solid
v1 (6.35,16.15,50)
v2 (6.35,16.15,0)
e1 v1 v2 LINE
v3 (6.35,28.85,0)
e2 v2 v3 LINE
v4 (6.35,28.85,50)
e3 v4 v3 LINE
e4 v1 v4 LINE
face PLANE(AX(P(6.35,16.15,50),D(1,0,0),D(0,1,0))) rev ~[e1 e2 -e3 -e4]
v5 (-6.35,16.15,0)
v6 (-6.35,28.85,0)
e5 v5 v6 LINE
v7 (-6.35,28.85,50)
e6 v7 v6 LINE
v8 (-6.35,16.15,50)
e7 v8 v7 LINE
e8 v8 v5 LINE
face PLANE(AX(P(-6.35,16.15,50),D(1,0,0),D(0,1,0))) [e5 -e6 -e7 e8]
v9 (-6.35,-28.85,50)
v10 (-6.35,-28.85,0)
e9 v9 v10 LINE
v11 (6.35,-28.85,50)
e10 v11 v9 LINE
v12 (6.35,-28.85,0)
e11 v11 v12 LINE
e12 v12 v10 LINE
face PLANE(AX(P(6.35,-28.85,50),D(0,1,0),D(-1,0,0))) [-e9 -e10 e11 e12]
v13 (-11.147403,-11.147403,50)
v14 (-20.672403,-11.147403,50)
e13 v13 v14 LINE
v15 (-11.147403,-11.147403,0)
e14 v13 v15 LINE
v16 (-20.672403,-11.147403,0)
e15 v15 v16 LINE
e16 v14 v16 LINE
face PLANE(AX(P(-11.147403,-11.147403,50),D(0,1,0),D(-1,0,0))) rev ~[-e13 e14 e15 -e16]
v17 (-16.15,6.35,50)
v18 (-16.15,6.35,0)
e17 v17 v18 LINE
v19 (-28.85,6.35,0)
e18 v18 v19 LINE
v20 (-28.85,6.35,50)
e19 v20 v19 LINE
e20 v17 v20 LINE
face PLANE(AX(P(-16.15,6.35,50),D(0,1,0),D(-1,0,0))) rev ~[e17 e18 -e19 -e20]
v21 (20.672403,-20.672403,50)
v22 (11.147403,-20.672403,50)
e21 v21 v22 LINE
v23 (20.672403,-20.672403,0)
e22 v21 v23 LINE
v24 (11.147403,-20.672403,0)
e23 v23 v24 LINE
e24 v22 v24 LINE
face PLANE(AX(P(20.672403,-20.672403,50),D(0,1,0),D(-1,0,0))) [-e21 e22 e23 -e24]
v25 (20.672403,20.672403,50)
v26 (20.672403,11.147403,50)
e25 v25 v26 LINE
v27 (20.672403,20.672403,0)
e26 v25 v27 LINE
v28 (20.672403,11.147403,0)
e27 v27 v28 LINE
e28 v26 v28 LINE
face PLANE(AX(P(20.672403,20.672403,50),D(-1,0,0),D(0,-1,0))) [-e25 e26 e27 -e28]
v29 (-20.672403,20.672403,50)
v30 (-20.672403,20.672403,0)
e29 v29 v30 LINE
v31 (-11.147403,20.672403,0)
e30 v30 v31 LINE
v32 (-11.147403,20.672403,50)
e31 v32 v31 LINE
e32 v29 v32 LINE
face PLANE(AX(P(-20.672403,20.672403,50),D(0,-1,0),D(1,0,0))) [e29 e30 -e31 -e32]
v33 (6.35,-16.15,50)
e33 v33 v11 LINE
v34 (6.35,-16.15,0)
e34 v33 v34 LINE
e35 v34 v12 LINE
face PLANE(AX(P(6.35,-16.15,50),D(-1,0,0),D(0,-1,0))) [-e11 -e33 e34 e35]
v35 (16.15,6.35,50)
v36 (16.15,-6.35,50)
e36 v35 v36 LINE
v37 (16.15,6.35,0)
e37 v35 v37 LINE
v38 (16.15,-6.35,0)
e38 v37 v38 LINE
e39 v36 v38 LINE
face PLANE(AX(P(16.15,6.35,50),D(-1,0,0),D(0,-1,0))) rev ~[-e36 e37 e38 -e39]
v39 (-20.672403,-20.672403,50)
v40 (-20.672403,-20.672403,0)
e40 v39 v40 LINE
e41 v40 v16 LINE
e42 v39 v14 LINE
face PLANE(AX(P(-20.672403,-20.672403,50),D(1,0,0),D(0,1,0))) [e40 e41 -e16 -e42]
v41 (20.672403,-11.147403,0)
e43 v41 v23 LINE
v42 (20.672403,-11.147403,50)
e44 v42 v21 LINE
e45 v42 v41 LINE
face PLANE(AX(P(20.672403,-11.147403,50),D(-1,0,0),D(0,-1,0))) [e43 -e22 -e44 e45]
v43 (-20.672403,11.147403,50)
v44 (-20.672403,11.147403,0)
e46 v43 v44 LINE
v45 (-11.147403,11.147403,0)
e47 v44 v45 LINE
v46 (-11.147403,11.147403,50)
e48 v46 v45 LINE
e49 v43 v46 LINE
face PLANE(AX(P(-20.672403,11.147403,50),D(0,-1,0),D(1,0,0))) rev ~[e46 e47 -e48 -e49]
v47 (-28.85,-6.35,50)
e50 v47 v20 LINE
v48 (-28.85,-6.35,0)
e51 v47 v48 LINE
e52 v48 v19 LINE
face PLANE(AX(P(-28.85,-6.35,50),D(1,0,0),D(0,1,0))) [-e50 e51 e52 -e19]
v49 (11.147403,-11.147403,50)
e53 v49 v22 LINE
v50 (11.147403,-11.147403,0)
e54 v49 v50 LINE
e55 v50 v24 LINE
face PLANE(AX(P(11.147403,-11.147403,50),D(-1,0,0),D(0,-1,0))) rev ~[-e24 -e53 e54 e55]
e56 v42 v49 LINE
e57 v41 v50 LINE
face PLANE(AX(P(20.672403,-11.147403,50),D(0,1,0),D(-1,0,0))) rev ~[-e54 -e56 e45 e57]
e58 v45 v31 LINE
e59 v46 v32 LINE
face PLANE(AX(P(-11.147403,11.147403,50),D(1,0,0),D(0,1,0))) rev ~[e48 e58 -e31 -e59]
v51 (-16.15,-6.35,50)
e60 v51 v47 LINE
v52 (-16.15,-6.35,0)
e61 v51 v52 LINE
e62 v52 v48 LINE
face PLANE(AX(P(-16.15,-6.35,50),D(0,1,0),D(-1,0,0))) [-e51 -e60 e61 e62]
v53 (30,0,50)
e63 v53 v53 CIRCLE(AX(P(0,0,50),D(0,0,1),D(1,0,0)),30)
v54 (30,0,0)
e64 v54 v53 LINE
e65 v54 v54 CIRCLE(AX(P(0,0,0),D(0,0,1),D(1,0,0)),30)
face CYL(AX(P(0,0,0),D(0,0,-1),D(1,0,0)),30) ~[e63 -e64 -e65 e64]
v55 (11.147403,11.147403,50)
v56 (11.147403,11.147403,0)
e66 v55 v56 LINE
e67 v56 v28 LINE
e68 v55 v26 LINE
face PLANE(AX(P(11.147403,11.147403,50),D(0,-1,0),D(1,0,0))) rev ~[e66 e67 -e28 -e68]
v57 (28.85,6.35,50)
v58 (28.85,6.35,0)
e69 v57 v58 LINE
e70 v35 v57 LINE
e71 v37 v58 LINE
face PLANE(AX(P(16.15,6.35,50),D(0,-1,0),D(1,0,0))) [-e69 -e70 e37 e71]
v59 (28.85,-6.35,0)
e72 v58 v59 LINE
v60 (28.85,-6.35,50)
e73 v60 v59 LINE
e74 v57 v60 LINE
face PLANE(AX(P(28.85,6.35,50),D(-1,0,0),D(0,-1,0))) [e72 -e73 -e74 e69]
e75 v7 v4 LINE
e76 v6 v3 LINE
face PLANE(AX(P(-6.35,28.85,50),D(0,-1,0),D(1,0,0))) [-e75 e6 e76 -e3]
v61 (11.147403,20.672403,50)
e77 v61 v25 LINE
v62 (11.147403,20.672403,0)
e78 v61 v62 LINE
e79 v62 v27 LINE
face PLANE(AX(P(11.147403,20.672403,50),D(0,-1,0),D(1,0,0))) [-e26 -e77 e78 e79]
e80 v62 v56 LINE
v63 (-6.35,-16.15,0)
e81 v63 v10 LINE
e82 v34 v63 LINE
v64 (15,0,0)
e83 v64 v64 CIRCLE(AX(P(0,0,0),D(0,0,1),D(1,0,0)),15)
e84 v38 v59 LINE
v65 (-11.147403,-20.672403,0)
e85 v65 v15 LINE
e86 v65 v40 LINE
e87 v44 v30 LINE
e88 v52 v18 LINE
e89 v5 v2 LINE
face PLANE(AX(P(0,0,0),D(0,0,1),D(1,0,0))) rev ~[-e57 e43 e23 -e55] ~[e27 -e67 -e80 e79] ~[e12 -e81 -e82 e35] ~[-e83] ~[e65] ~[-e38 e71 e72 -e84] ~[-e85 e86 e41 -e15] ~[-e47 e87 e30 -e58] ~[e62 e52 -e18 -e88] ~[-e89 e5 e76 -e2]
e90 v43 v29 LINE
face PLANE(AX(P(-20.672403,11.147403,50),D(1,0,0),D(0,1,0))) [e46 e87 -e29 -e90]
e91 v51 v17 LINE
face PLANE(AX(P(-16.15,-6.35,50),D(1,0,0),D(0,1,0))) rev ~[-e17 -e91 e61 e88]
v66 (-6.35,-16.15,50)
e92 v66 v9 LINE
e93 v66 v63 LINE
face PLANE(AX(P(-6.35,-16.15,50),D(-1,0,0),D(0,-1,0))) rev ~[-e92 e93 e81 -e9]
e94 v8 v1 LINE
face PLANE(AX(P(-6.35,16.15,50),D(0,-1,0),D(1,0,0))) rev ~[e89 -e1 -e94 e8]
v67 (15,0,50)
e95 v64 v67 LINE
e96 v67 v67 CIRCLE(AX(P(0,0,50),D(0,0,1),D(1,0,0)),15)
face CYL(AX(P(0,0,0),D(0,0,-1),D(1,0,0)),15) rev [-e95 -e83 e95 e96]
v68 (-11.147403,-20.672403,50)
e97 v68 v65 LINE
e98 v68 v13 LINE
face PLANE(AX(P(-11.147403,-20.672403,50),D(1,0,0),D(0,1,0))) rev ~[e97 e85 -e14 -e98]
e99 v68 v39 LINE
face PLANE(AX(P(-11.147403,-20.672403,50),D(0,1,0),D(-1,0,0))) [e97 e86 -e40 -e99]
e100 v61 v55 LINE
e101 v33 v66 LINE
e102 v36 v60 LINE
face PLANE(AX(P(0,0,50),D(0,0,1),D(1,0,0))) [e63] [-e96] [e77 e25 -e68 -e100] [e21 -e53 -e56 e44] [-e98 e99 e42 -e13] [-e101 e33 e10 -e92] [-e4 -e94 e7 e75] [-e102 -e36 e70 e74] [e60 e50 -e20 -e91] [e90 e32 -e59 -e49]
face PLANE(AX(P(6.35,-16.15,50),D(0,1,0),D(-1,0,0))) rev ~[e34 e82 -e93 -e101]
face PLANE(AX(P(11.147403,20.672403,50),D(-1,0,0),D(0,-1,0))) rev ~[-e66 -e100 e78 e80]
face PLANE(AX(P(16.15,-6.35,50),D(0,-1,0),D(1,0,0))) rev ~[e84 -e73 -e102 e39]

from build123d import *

# Parameters (mm, degrees)
F0_R            = 30
F0_R_2          = 15
F1_DEPTH        = 50
F2_W            = 12.7
F2_H            = 12.7
F3_DEPTH        = 50.001
F3_COPIES_COUNT = 4
F4_W            = 9.525
F4_H            = 9.525
F5_DEPTH        = 50.001
F5_COPIES_COUNT = 4


# Not quite as in the source:
# - a pattern or mirror of a feature is missing from the dataset's text; its kind, count and spacing are read off the source's solid


with BuildPart() as f1:
    # F0 (on Top) → F1 (new body)
    with BuildSketch(Plane.XY):
        Circle(F0_R)
        Circle(F0_R_2, mode=Mode.SUBTRACT)
    extrude(amount=F1_DEPTH)

    # F2 (on face) → F3 (cut, through all)
    with BuildSketch(Plane.XY.offset(50)):
        with Locations((0, 22.5)):
            Rectangle(F2_W, F2_H)
    f3 = extrude(amount=-F3_DEPTH, mode=Mode.SUBTRACT)

    # F3_copies: F3 ×4 about axis
    f3_copies_axis = Axis((0, 0, 0), (0, 0, 1))
    for i in range(1, F3_COPIES_COUNT):
        add(f3.rotate(f3_copies_axis, i * 360 / F3_COPIES_COUNT), mode=Mode.SUBTRACT)

    # F4 (on face) → F5 (cut, through all)
    with BuildSketch(Plane.XY.offset(50)):
        with Locations((-15.9099025767, 15.9099025767)):
            Rectangle(F4_W, F4_H)
    f5 = extrude(amount=-F5_DEPTH, mode=Mode.SUBTRACT)

    # F5_copies: F5 ×4 about axis
    f5_copies_axis = Axis((0, 0, 0), (0, 0, 1))
    for i in range(1, F5_COPIES_COUNT):
        add(f5.rotate(f5_copies_axis, i * 360 / F5_COPIES_COUNT), mode=Mode.SUBTRACT)


solid = f1.part
